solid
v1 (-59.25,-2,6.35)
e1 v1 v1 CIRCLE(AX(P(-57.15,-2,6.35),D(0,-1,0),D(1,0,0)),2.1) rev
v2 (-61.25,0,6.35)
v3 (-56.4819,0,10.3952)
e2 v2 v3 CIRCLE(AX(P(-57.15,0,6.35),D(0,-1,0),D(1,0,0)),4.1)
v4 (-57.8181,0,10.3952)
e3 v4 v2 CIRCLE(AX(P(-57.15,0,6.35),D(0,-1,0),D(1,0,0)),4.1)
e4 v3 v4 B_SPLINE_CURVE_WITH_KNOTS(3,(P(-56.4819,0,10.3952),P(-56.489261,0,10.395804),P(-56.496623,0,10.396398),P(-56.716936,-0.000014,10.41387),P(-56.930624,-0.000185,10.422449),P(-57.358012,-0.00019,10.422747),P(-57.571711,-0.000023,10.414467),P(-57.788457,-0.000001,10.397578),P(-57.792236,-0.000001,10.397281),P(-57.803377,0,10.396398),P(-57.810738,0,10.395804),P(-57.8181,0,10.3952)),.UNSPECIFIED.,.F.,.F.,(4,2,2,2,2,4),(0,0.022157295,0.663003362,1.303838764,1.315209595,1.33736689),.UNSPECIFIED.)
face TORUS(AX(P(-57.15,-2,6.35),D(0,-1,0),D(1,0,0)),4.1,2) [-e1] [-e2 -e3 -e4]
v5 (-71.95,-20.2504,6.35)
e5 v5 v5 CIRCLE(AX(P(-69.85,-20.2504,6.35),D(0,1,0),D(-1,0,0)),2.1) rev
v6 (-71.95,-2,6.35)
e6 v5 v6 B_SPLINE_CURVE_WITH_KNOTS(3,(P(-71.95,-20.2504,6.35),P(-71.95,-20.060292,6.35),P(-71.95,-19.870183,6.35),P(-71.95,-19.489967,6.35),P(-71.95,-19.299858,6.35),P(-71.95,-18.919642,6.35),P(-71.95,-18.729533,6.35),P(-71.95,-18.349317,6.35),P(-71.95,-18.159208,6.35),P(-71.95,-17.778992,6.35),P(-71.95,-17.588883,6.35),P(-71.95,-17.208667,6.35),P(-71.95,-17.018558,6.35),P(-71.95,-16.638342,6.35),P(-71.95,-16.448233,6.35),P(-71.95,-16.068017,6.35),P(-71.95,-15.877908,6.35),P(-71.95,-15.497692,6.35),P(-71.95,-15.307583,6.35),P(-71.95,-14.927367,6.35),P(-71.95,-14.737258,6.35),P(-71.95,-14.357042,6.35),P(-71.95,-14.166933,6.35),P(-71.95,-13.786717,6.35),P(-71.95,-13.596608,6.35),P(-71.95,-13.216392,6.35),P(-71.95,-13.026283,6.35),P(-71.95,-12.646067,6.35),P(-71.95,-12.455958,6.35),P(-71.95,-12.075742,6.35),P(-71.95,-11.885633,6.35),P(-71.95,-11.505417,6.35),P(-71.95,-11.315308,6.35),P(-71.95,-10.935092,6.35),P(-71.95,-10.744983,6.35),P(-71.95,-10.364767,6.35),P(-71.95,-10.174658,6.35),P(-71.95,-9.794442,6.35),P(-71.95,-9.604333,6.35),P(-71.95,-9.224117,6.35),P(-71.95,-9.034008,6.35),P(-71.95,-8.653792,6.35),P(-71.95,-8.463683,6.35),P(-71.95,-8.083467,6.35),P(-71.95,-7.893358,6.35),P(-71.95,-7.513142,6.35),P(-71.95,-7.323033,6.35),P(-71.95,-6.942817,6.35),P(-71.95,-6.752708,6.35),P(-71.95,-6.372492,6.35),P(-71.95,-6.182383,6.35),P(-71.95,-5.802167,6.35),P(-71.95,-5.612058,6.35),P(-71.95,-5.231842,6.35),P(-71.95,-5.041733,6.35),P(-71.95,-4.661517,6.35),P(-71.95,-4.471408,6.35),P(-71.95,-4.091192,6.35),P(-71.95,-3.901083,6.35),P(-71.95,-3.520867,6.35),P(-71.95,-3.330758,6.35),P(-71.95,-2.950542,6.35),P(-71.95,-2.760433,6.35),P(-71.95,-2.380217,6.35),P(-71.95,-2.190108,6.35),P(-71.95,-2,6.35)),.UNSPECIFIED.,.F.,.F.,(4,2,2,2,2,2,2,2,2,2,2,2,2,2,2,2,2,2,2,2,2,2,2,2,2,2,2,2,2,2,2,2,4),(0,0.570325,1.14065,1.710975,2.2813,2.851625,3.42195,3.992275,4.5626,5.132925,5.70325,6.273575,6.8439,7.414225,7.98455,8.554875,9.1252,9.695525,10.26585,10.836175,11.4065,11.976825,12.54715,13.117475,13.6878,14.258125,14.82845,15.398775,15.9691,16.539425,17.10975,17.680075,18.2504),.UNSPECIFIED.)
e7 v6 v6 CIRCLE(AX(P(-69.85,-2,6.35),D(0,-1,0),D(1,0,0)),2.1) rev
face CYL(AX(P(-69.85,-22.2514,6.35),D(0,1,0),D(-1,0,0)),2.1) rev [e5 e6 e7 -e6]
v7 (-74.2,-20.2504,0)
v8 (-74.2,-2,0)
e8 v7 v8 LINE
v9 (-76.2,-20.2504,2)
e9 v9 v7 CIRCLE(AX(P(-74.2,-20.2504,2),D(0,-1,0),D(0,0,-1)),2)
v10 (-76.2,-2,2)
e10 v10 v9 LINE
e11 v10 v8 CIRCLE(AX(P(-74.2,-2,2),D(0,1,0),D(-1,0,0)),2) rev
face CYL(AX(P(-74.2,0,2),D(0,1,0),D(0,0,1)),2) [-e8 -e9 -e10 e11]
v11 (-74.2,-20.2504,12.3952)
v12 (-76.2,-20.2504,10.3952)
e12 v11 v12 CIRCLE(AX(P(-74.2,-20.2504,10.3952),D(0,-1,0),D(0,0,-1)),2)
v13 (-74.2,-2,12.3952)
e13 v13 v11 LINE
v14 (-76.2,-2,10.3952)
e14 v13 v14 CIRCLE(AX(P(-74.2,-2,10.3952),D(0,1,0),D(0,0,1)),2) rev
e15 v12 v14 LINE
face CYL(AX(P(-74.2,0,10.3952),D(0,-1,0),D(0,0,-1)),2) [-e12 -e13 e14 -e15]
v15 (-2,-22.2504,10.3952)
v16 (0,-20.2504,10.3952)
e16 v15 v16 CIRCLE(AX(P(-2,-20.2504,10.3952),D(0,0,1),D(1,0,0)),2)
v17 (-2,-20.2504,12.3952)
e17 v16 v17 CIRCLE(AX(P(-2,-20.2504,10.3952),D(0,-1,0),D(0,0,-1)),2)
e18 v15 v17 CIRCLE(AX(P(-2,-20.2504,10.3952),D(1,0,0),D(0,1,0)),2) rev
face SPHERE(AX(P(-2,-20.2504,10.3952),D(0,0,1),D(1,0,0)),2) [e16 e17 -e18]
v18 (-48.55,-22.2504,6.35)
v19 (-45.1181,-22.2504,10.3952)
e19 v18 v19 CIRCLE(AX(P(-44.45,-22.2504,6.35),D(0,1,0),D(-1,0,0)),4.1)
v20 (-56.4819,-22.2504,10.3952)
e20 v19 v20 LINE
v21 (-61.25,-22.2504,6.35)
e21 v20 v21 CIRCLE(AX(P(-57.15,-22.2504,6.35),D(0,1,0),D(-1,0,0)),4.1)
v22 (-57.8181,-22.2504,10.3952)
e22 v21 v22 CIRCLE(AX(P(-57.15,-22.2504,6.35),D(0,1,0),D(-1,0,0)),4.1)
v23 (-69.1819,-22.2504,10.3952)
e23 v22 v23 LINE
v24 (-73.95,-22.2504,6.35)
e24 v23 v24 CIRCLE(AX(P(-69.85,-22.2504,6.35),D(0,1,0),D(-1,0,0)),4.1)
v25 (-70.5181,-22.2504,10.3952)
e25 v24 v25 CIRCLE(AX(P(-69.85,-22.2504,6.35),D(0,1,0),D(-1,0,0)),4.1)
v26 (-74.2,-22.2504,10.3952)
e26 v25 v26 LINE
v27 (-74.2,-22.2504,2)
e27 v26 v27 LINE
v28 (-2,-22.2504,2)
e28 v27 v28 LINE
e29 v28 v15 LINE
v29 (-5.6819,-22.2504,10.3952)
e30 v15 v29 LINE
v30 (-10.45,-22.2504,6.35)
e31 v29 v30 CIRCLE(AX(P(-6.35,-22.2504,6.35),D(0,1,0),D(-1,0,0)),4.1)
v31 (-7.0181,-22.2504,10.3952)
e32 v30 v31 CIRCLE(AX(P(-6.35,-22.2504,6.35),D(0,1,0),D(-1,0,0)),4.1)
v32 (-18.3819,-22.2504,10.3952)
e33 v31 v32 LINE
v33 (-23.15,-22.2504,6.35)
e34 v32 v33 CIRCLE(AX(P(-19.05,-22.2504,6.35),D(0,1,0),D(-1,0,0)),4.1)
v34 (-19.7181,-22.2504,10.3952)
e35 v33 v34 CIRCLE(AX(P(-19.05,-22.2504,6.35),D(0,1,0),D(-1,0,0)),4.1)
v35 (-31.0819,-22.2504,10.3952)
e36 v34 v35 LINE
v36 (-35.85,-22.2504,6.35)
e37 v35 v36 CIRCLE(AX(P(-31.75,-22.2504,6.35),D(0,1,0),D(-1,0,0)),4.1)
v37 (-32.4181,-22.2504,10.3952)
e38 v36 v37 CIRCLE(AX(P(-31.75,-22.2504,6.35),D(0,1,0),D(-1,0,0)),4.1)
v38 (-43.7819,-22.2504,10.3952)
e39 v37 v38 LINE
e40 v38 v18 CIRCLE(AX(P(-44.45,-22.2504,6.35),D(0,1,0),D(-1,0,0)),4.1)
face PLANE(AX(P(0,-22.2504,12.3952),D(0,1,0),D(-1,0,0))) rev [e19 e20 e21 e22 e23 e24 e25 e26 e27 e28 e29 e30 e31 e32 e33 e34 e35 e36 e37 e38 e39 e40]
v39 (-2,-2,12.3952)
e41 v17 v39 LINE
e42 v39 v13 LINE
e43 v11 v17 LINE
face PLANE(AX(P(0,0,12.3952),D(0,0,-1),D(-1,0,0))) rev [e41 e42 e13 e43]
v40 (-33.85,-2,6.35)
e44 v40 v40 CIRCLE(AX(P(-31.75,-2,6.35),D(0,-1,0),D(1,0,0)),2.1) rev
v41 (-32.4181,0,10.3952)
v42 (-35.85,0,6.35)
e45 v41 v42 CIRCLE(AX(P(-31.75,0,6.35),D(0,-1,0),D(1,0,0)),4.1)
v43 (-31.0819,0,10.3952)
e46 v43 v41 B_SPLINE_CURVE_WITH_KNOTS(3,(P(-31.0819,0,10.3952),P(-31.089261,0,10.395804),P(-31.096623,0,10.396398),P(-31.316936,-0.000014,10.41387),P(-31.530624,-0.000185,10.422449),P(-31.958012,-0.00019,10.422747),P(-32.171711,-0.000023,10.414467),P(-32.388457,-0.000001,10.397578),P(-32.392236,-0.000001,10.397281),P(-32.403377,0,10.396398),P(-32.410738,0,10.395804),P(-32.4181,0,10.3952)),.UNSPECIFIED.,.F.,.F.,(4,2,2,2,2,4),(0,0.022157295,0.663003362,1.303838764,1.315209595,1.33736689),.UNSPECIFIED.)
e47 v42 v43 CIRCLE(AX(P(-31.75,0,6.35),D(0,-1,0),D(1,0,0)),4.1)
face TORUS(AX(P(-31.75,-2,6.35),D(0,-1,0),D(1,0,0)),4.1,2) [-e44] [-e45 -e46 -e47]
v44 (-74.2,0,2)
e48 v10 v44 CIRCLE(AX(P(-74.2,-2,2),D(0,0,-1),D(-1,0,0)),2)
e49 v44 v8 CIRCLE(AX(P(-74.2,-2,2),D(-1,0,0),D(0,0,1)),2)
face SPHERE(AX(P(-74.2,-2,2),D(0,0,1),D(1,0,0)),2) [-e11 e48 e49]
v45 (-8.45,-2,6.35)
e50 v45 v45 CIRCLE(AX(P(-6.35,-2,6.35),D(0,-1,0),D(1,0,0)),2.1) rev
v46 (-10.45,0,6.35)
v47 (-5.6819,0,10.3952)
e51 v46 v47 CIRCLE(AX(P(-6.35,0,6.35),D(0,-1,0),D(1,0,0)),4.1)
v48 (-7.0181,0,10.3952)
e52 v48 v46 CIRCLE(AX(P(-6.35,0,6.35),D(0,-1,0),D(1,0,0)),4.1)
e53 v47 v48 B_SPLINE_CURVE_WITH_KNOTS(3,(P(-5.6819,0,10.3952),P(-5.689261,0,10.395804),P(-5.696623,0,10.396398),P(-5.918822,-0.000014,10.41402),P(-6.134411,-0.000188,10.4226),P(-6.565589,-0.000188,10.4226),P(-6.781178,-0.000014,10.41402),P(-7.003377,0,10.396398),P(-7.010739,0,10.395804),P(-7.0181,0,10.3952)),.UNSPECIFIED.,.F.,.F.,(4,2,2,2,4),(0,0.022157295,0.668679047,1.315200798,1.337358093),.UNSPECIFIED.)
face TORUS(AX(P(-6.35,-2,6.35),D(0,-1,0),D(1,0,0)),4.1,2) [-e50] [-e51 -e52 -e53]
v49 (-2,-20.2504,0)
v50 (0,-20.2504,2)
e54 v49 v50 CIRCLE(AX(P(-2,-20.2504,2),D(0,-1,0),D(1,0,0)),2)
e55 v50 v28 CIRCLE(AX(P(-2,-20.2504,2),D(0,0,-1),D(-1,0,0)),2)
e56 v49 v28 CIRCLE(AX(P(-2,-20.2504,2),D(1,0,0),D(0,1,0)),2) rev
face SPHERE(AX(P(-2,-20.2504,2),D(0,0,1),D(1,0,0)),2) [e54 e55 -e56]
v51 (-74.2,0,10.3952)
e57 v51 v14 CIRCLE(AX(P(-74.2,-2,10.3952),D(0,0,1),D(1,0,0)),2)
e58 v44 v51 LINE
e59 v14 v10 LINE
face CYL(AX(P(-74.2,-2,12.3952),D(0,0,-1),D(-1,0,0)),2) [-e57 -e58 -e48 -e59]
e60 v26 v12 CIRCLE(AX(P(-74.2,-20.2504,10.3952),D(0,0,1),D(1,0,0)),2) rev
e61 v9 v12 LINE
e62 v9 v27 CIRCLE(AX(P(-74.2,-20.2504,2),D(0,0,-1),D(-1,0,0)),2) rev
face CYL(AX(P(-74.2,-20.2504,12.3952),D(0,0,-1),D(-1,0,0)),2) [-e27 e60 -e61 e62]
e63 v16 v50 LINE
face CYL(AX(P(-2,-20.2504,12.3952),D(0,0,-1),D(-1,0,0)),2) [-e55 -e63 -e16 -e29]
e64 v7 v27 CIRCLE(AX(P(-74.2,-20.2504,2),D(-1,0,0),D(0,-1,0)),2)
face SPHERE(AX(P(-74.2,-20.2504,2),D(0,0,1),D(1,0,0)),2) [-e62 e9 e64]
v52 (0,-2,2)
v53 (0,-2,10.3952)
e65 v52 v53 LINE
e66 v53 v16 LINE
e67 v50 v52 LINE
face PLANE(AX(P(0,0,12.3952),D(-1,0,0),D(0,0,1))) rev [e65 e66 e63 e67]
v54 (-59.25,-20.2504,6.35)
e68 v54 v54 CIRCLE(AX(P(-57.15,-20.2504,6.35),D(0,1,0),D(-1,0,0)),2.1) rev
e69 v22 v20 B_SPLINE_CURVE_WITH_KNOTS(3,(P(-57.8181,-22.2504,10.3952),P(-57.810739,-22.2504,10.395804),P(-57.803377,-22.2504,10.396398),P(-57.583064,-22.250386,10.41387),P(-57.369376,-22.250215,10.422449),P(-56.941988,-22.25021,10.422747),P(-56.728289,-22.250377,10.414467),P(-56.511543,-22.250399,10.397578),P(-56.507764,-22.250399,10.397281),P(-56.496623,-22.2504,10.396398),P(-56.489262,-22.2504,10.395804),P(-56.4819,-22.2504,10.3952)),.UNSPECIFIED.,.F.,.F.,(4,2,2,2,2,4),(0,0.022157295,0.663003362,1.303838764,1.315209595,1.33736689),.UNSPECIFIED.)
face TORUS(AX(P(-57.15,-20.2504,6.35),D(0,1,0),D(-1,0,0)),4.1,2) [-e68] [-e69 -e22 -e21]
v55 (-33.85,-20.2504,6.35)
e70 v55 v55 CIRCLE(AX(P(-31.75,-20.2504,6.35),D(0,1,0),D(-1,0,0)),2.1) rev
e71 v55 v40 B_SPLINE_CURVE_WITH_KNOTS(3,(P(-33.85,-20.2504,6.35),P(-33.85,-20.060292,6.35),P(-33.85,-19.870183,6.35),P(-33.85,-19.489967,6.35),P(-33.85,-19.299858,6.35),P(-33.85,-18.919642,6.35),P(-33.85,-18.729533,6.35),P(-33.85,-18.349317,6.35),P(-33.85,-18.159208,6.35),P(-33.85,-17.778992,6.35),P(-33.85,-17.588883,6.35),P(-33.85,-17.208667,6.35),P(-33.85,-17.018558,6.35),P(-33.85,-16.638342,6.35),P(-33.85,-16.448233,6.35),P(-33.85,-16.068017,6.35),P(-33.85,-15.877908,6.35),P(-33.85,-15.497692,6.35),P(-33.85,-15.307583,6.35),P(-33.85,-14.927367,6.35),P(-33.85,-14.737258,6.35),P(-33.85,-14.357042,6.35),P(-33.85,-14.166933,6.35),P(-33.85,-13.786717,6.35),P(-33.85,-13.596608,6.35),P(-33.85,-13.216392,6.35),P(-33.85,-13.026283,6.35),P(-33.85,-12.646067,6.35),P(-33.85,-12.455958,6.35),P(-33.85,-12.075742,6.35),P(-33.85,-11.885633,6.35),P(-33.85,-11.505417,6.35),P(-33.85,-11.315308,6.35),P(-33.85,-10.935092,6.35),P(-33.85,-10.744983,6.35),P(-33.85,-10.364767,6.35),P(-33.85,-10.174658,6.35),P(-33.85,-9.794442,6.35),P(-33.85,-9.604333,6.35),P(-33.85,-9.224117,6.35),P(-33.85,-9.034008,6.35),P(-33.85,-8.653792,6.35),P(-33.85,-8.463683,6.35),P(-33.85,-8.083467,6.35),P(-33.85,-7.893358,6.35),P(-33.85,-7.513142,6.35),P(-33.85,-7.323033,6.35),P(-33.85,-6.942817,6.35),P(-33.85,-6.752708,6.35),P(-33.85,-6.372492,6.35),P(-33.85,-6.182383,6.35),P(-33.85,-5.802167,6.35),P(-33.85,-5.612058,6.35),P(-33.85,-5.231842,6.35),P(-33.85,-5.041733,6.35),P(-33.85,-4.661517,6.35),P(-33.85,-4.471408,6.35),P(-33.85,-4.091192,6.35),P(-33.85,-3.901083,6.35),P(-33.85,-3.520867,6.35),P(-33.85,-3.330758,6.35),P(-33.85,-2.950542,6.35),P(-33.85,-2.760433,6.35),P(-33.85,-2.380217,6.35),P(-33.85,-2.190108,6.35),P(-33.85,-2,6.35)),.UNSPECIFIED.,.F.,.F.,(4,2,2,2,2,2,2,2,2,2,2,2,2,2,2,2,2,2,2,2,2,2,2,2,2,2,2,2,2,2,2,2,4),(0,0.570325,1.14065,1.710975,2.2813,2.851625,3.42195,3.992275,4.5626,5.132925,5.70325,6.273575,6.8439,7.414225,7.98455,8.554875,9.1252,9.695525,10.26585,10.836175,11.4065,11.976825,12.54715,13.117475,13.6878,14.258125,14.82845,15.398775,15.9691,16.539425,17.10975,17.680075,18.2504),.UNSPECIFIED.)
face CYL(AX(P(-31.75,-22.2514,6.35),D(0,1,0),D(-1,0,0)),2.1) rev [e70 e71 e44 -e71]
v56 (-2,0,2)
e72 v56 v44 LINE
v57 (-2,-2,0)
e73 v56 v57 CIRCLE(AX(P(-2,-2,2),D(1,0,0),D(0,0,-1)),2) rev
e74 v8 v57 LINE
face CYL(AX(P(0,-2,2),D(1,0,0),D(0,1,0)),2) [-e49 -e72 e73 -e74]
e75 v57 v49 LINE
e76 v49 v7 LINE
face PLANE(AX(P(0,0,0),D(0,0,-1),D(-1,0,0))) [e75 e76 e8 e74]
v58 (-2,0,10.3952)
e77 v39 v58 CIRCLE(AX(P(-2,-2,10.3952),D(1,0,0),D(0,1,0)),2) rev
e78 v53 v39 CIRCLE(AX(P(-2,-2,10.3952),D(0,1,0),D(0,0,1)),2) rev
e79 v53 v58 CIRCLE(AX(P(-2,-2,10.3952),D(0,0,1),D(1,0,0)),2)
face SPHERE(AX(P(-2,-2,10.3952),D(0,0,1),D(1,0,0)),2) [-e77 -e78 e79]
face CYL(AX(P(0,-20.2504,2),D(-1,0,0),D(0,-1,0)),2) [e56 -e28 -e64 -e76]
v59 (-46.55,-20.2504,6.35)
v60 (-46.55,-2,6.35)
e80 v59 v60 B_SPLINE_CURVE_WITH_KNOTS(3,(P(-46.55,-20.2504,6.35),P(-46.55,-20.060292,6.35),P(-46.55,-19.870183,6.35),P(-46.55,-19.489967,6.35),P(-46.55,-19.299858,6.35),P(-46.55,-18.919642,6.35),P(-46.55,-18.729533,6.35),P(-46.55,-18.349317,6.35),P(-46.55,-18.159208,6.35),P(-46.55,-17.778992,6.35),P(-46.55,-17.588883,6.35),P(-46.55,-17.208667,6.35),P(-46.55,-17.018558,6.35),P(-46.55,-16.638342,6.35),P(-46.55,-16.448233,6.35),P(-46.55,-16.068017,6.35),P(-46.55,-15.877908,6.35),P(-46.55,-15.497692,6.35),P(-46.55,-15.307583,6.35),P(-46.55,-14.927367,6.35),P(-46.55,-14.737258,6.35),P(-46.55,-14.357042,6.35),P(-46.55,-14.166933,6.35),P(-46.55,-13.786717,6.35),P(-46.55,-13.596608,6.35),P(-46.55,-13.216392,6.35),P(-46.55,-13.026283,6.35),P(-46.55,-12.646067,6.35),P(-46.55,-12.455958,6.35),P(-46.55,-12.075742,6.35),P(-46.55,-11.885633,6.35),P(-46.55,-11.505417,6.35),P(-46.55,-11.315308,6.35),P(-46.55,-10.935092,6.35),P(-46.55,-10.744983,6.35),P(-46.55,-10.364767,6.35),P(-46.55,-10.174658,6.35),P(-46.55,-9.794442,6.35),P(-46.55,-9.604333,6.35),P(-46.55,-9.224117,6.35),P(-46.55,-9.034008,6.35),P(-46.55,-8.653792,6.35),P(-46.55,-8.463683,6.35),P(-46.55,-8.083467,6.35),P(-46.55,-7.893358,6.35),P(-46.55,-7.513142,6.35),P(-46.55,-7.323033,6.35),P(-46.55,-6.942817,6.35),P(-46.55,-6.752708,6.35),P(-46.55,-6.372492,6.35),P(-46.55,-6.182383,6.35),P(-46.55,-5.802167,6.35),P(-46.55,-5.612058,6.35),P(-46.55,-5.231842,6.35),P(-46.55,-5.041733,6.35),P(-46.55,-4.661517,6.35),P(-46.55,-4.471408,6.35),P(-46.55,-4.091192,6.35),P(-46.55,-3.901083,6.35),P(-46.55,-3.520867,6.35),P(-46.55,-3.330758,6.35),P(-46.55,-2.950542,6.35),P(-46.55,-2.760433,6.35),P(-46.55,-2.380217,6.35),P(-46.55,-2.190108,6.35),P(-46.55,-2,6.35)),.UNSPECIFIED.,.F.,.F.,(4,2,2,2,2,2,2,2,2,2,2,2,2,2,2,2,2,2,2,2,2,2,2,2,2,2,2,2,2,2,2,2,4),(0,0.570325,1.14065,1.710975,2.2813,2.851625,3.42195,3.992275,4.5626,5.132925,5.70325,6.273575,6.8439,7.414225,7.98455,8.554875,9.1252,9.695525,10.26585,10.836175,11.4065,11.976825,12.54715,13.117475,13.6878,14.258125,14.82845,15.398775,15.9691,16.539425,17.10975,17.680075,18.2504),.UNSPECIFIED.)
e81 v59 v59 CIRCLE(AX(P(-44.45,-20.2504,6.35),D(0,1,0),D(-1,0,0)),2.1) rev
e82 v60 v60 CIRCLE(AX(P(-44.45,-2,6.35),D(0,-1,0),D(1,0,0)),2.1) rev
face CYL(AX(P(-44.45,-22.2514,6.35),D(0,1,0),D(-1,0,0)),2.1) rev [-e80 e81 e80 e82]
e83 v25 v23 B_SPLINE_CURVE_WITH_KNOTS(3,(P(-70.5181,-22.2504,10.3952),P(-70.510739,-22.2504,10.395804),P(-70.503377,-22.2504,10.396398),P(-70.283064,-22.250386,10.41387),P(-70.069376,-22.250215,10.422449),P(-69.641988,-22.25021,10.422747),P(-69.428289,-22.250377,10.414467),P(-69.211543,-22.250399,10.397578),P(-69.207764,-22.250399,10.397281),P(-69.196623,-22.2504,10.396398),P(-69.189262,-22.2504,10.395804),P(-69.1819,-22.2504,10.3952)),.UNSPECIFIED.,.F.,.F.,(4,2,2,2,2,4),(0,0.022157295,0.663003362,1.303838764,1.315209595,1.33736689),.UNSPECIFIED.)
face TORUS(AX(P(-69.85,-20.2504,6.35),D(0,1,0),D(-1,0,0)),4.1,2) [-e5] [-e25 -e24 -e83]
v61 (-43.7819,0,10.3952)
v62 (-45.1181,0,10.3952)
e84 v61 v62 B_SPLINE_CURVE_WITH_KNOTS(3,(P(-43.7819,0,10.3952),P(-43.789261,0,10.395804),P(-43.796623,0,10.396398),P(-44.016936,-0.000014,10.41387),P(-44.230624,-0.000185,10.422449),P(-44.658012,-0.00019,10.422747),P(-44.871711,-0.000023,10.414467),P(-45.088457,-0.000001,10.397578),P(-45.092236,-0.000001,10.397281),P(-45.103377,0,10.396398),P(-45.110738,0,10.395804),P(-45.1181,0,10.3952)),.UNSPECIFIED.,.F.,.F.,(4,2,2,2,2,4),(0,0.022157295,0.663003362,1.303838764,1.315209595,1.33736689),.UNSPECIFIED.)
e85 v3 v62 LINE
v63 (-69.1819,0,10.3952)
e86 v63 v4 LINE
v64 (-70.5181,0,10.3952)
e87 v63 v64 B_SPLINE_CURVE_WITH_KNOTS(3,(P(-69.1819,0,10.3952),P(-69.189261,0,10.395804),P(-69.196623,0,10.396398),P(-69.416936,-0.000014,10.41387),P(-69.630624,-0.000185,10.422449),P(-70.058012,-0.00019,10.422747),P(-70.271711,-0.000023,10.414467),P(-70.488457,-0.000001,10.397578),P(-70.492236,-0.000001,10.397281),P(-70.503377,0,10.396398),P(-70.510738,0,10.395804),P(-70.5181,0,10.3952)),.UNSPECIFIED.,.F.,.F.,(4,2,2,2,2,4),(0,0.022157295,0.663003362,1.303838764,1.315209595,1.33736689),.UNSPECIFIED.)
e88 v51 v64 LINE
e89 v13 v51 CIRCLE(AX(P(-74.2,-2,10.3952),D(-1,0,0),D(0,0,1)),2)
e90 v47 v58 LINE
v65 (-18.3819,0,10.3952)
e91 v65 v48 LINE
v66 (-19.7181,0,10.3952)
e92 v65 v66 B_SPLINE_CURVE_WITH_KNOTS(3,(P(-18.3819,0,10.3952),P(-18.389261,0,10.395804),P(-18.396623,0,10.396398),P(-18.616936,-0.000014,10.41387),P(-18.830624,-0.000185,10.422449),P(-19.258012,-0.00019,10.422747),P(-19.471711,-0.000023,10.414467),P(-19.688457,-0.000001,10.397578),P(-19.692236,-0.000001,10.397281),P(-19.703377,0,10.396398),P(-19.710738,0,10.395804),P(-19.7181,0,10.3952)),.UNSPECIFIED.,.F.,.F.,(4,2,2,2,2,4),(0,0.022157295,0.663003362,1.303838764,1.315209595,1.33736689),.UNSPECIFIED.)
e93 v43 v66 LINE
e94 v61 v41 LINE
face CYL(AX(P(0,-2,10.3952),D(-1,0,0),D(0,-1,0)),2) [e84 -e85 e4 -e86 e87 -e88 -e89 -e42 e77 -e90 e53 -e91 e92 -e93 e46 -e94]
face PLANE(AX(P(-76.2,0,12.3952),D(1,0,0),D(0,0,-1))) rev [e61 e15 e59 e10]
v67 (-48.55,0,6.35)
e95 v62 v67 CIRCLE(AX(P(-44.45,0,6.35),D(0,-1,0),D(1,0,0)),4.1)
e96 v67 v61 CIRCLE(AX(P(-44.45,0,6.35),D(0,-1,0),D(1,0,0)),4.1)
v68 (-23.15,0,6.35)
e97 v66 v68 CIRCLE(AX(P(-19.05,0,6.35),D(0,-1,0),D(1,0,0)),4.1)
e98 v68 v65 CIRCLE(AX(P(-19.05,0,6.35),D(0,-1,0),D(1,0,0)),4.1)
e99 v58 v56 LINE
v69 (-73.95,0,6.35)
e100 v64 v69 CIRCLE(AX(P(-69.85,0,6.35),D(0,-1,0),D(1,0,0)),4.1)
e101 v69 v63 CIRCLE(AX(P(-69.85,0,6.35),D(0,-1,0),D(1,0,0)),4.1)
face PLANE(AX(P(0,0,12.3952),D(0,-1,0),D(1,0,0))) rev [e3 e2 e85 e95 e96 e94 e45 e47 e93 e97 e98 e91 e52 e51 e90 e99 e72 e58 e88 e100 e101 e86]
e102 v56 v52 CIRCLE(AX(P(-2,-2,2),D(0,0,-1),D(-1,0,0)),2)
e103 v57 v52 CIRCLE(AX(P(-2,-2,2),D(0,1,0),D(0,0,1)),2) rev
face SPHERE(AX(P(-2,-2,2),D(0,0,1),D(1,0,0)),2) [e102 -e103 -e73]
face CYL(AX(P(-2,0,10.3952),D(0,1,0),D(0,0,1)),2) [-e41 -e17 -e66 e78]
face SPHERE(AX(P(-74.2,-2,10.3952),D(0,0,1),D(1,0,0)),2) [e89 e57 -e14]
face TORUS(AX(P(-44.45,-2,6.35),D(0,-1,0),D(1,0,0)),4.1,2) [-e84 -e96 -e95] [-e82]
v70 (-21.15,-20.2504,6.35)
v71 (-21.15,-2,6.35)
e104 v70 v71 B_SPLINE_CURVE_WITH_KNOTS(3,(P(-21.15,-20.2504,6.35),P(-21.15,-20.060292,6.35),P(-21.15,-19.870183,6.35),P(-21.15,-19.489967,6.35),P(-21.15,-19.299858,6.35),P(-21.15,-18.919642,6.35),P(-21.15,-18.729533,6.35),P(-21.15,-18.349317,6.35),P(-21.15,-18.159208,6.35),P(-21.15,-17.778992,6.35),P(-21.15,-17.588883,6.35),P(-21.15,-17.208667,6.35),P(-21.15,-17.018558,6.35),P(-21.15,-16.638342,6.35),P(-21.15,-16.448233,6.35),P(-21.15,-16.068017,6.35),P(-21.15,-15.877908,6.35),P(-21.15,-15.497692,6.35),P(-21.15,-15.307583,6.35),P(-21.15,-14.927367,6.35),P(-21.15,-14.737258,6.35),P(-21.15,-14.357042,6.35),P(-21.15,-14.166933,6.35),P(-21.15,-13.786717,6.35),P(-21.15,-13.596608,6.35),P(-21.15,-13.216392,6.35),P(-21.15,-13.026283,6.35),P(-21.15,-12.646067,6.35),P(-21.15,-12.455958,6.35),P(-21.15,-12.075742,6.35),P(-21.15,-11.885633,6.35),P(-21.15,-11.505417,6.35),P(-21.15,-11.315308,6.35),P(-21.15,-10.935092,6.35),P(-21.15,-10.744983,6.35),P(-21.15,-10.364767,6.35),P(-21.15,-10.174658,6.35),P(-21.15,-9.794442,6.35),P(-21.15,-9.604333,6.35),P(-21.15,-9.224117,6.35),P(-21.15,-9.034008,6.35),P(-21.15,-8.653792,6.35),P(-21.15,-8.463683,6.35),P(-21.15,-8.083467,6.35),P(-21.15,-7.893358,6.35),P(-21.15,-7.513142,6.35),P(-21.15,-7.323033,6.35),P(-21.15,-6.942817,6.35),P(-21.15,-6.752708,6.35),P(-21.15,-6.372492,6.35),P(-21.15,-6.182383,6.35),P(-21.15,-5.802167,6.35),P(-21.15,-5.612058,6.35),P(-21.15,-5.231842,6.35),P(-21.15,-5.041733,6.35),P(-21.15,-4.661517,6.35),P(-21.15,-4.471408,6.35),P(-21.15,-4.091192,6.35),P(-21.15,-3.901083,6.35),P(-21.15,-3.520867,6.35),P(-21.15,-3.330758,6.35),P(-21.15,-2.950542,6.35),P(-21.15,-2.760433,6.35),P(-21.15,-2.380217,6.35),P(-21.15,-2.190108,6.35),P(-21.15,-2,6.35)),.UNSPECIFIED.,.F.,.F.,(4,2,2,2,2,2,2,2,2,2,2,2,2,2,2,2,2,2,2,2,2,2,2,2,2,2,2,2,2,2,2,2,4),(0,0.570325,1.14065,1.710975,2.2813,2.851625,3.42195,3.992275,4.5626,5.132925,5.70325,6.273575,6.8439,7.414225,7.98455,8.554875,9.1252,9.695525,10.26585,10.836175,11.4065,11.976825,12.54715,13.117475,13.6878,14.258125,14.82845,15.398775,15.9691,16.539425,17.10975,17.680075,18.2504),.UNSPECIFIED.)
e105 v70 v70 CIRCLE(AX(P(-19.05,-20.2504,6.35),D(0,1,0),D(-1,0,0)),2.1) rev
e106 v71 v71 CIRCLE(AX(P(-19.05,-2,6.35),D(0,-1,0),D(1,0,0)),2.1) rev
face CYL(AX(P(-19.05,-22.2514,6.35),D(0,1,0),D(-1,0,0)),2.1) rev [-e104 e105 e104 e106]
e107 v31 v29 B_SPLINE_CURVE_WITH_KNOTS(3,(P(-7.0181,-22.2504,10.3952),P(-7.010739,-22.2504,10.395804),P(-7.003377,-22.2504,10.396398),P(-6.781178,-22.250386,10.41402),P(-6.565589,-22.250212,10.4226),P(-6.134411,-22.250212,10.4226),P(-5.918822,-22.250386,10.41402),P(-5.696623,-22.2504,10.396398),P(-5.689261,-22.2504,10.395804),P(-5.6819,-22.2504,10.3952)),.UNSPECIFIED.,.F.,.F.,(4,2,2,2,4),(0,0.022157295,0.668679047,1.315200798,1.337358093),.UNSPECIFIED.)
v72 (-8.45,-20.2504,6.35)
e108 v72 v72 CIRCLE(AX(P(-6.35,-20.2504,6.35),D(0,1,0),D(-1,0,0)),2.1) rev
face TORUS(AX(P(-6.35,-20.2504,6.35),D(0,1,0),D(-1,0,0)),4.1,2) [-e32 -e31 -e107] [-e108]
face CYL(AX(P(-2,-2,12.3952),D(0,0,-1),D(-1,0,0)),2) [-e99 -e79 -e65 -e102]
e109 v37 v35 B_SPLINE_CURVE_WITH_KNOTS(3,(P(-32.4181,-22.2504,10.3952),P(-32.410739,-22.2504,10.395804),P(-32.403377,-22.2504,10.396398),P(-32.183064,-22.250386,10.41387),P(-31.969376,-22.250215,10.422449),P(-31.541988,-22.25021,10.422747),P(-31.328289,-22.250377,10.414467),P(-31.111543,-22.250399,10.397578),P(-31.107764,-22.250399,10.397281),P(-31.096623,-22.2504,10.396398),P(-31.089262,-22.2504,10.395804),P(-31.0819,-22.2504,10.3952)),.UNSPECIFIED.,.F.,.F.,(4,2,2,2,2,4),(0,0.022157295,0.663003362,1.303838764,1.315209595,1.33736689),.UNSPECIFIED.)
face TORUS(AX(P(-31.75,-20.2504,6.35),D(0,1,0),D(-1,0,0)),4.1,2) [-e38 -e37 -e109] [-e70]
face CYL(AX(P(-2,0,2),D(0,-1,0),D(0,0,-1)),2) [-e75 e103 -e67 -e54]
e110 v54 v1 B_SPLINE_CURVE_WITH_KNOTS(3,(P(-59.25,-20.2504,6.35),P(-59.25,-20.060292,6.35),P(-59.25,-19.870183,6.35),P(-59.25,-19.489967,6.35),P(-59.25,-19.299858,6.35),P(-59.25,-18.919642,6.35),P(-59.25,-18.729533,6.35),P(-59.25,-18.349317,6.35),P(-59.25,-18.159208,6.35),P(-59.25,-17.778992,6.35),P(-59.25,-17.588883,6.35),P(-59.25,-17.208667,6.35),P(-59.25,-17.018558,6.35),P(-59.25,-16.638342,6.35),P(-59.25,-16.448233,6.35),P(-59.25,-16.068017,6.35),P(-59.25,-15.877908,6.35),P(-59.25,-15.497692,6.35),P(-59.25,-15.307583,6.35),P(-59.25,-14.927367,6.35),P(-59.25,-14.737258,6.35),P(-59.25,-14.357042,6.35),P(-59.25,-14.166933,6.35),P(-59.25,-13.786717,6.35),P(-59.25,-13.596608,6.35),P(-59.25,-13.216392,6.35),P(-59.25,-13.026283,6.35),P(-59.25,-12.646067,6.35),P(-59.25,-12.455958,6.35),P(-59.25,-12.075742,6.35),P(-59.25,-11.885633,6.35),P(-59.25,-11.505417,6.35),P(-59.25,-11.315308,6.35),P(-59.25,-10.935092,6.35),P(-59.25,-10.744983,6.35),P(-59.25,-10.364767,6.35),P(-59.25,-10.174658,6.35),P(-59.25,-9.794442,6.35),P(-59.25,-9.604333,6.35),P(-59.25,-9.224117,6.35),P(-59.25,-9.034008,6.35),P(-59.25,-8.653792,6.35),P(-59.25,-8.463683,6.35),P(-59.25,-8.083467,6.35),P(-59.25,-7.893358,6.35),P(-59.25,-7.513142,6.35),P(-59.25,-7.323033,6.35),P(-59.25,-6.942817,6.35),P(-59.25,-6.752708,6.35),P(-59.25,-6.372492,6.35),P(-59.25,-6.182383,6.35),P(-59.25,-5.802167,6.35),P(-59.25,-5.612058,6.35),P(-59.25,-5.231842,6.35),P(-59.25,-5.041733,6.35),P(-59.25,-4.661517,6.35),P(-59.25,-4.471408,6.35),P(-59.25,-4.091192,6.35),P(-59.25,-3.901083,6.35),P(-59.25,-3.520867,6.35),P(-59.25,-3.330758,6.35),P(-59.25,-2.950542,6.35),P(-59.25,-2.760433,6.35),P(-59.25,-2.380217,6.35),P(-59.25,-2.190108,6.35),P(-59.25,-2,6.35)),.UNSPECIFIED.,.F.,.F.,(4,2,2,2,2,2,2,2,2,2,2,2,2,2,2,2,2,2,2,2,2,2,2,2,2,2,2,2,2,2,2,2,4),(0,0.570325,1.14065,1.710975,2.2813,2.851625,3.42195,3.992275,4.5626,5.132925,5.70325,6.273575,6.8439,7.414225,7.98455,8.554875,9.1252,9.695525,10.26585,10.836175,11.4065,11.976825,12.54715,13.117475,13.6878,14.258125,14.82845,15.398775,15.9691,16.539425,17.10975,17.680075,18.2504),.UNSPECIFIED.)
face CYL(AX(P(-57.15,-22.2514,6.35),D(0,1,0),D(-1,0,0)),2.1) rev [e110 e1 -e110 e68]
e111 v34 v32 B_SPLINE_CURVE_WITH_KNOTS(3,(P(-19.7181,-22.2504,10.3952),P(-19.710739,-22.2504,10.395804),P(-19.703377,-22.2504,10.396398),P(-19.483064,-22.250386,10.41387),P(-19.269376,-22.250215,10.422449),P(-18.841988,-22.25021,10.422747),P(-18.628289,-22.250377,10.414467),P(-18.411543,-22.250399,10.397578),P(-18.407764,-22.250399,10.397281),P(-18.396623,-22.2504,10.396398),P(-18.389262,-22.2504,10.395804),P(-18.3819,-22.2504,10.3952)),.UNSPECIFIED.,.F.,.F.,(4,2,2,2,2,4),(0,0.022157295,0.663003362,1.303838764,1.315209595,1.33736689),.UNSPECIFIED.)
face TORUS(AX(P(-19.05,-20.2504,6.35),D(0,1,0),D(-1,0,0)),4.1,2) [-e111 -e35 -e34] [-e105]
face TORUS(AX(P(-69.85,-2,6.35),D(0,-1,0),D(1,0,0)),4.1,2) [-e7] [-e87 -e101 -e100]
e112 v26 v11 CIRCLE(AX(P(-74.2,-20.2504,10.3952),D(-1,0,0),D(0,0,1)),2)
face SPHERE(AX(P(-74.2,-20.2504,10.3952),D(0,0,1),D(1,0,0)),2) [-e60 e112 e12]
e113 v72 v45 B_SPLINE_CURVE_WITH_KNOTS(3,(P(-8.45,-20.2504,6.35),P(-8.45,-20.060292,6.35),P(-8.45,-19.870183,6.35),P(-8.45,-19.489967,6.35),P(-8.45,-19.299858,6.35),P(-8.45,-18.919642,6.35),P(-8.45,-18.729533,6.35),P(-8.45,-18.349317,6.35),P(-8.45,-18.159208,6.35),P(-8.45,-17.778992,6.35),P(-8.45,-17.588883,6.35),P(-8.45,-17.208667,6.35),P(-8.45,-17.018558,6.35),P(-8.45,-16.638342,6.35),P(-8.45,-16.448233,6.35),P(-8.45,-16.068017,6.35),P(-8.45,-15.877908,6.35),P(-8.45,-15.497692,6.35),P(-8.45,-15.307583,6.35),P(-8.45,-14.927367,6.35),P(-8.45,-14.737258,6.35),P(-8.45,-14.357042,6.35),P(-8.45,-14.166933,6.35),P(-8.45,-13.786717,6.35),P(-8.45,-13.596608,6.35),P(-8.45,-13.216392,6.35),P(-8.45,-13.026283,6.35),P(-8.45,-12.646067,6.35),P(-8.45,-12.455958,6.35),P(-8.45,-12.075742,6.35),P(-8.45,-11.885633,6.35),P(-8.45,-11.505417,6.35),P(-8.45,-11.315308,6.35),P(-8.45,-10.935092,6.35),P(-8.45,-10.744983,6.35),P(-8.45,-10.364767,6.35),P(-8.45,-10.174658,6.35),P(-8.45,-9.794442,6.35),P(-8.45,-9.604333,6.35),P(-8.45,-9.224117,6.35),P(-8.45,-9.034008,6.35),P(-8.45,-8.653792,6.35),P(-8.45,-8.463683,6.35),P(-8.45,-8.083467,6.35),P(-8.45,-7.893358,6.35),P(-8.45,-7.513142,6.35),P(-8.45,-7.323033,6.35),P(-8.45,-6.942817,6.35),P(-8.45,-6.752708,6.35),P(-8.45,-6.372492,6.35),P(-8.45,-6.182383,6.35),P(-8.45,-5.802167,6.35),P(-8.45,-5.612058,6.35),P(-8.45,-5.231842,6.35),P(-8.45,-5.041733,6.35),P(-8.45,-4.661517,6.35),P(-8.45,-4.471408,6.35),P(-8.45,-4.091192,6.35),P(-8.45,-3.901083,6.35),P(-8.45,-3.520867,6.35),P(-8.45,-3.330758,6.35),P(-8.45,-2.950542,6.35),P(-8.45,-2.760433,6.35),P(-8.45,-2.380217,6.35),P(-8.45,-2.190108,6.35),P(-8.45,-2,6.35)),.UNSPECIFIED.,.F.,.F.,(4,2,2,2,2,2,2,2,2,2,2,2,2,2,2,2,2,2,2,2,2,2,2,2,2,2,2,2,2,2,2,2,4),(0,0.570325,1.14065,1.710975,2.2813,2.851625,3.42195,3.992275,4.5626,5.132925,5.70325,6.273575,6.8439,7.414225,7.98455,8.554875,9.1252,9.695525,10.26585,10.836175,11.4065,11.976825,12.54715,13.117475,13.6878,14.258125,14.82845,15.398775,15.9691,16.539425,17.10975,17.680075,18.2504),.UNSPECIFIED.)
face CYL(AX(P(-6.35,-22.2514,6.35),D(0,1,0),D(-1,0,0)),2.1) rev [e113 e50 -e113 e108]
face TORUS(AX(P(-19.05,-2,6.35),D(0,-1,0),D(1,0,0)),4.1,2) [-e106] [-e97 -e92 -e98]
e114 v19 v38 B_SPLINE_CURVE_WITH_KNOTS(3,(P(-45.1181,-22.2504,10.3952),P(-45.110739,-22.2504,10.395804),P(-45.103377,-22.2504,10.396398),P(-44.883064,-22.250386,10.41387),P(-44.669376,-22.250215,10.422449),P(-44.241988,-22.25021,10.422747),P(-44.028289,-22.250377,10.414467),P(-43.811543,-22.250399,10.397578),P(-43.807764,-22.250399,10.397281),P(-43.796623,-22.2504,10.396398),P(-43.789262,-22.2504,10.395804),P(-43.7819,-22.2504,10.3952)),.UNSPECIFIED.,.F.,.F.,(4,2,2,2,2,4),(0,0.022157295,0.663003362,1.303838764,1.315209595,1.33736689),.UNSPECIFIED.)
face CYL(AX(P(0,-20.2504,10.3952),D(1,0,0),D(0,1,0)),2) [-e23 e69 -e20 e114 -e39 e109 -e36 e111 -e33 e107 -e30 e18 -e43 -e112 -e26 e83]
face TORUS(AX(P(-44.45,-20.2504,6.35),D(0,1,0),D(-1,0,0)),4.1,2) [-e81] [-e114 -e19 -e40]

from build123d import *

# Parameters (mm, degrees)
SKETCH1_W           = 76.2
SKETCH1_H           = 22.2504
BOSS_EXTRUDE1_DEPTH = 12.3952
CUT_EXTRUDE1_REACH  = 82.344
SKETCH2_R           = 2.1
FILLET1_R           = 2


with BuildPart() as part:
    # Sketch1 → Boss-Extrude1 (new body)
    with BuildSketch(Plane.XY):
        with Locations((-38.1, -11.1252)):
            Rectangle(SKETCH1_W, SKETCH1_H)
    extrude(amount=BOSS_EXTRUDE1_DEPTH)

    # Sketch2 → Cut-Extrude1 (cut, up to next)
    with BuildSketch(Plane(origin=(0, 0, 0), x_dir=(1, 0, 0), z_dir=(0, 1, 0)), mode=Mode.PRIVATE) as cut_extrude1_sk1:
        with Locations(Location((-69.85, -6.35, 0), (0, 0, 180))):
            Circle(SKETCH2_R)
    cut_extrude1_tool1 = extrude(cut_extrude1_sk1.sketch, amount=-CUT_EXTRUDE1_REACH, mode=Mode.PRIVATE) & part.part
    # Sketch2 → Cut-Extrude1 (cut, up to next)
    with BuildSketch(Plane(origin=(0, 0, 0), x_dir=(1, 0, 0), z_dir=(0, 1, 0)), mode=Mode.PRIVATE) as cut_extrude1_sk2:
        with Locations(Location((-57.15, -6.35, 0), (0, 0, 180))):
            Circle(SKETCH2_R)
    cut_extrude1_tool2 = extrude(cut_extrude1_sk2.sketch, amount=-CUT_EXTRUDE1_REACH, mode=Mode.PRIVATE) & part.part
    # Sketch2 → Cut-Extrude1 (cut, up to next)
    with BuildSketch(Plane(origin=(0, 0, 0), x_dir=(1, 0, 0), z_dir=(0, 1, 0)), mode=Mode.PRIVATE) as cut_extrude1_sk3:
        with Locations(Location((-44.45, -6.35, 0), (0, 0, 180))):
            Circle(SKETCH2_R)
    cut_extrude1_tool3 = extrude(cut_extrude1_sk3.sketch, amount=-CUT_EXTRUDE1_REACH, mode=Mode.PRIVATE) & part.part
    # Sketch2 → Cut-Extrude1 (cut, up to next)
    with BuildSketch(Plane(origin=(0, 0, 0), x_dir=(1, 0, 0), z_dir=(0, 1, 0)), mode=Mode.PRIVATE) as cut_extrude1_sk4:
        with Locations(Location((-31.75, -6.35, 0), (0, 0, 180))):
            Circle(SKETCH2_R)
    cut_extrude1_tool4 = extrude(cut_extrude1_sk4.sketch, amount=-CUT_EXTRUDE1_REACH, mode=Mode.PRIVATE) & part.part
    # Sketch2 → Cut-Extrude1 (cut, up to next)
    with BuildSketch(Plane(origin=(0, 0, 0), x_dir=(1, 0, 0), z_dir=(0, 1, 0)), mode=Mode.PRIVATE) as cut_extrude1_sk5:
        with Locations(Location((-19.05, -6.35, 0), (0, 0, 180))):
            Circle(SKETCH2_R)
    cut_extrude1_tool5 = extrude(cut_extrude1_sk5.sketch, amount=-CUT_EXTRUDE1_REACH, mode=Mode.PRIVATE) & part.part
    # Sketch2 → Cut-Extrude1 (cut, up to next)
    with BuildSketch(Plane(origin=(0, 0, 0), x_dir=(1, 0, 0), z_dir=(0, 1, 0)), mode=Mode.PRIVATE) as cut_extrude1_sk6:
        with Locations(Location((-6.35, -6.35, 0), (0, 0, 180))):
            Circle(SKETCH2_R)
    cut_extrude1_tool6 = extrude(cut_extrude1_sk6.sketch, amount=-CUT_EXTRUDE1_REACH, mode=Mode.PRIVATE) & part.part
    add(cut_extrude1_tool1.solids().sort_by_distance((-69.85, 0, 6.35))[0], mode=Mode.SUBTRACT)
    add(cut_extrude1_tool2.solids().sort_by_distance((-57.15, 0, 6.35))[0], mode=Mode.SUBTRACT)
    add(cut_extrude1_tool3.solids().sort_by_distance((-44.45, 0, 6.35))[0], mode=Mode.SUBTRACT)
    add(cut_extrude1_tool4.solids().sort_by_distance((-31.75, 0, 6.35))[0], mode=Mode.SUBTRACT)
    add(cut_extrude1_tool5.solids().sort_by_distance((-19.05, 0, 6.35))[0], mode=Mode.SUBTRACT)
    add(cut_extrude1_tool6.solids().sort_by_distance((-6.35, 0, 6.35))[0], mode=Mode.SUBTRACT)

    # Fillet1
    # the kernel refuses this fillet: 2 mm, written as the material it takes off along each edge
    with BuildSketch(Plane(origin=(-74.2, -2, 10.3952), x_dir=(0, 0, 1), z_dir=(0, 1, 0))) as fillet1_piece_1_section:
        Polygon((0, 0), (FILLET1_R, 0), (FILLET1_R, -FILLET1_R), (0, -FILLET1_R), align=None)
    fillet1_piece_1 = extrude(amount=FILLET1_R, mode=Mode.PRIVATE)
    fillet1_piece_1 = fillet1_piece_1 - Plane(origin=(-74.2, -2, 10.3952), x_dir=(0.7071067811865475, 0, -0.7071067811865475), z_dir=(0, 1, 0)) * Sphere(FILLET1_R, mode=Mode.PRIVATE)
    add(fillet1_piece_1, mode=Mode.SUBTRACT)
    with BuildSketch(Plane(origin=(-74.2, -20.2504, 10.3952), x_dir=(0, 0, 1), z_dir=(0, -1, 0))) as fillet1_piece_2_section:
        Polygon((0, 0), (FILLET1_R, 0), (FILLET1_R, FILLET1_R), (0, FILLET1_R), align=None)
    fillet1_piece_2 = extrude(amount=FILLET1_R, mode=Mode.PRIVATE)
    fillet1_piece_2 = fillet1_piece_2 - Plane(origin=(-74.2, -20.2504, 10.3952), x_dir=(0.7071067811865475, 0, -0.7071067811865475), z_dir=(0, -1, 0)) * Sphere(FILLET1_R, mode=Mode.PRIVATE)
    add(fillet1_piece_2, mode=Mode.SUBTRACT)
    with BuildSketch(Plane(origin=(-2, -20.2504, 10.3952), x_dir=(1, 0, 0), z_dir=(0, -1, 0))) as fillet1_piece_3_section:
        Polygon((0, 0), (FILLET1_R, 0), (FILLET1_R, FILLET1_R), (0, FILLET1_R), align=None)
    fillet1_piece_3 = extrude(amount=FILLET1_R, mode=Mode.PRIVATE)
    fillet1_piece_3 = fillet1_piece_3 - Plane(origin=(-2, -20.2504, 10.3952), x_dir=(-0.7071067811865475, 0, -0.7071067811865475), z_dir=(0, -1, 0)) * Sphere(FILLET1_R, mode=Mode.PRIVATE)
    add(fillet1_piece_3, mode=Mode.SUBTRACT)
    with BuildSketch(Plane(origin=(-2, -2, 10.3952), x_dir=(1, 0, 0), z_dir=(0, 1, 0))) as fillet1_piece_4_section:
        Polygon((0, 0), (FILLET1_R, 0), (FILLET1_R, -FILLET1_R), (0, -FILLET1_R), align=None)
    fillet1_piece_4 = extrude(amount=FILLET1_R, mode=Mode.PRIVATE)
    fillet1_piece_4 = fillet1_piece_4 - Plane(origin=(-2, -2, 10.3952), x_dir=(-0.7071067811865475, 0, -0.7071067811865475), z_dir=(0, 1, 0)) * Sphere(FILLET1_R, mode=Mode.PRIVATE)
    add(fillet1_piece_4, mode=Mode.SUBTRACT)
    with BuildSketch(Plane(origin=(-74.2, -20.2504, 2), x_dir=(0, -1, 0), z_dir=(0, 0, -1))) as fillet1_piece_5_section:
        Polygon((0, 0), (FILLET1_R, 0), (FILLET1_R, FILLET1_R), (0, FILLET1_R), align=None)
    fillet1_piece_5 = extrude(amount=FILLET1_R, mode=Mode.PRIVATE)
    fillet1_piece_5 = fillet1_piece_5 - Plane(origin=(-74.2, -20.2504, 2), x_dir=(0.7071067811865475, 0.7071067811865476, 0), z_dir=(0, 0, -1)) * Sphere(FILLET1_R, mode=Mode.PRIVATE)
    add(fillet1_piece_5, mode=Mode.SUBTRACT)
    with BuildSketch(Plane(origin=(-2, -20.2504, 2), x_dir=(0, 0, -1), z_dir=(1, 0, 0))) as fillet1_piece_6_section:
        Polygon((0, 0), (FILLET1_R, 0), (FILLET1_R, -FILLET1_R), (0, -FILLET1_R), align=None)
    fillet1_piece_6 = extrude(amount=FILLET1_R, mode=Mode.PRIVATE)
    fillet1_piece_6 = fillet1_piece_6 - Plane(origin=(-2, -20.2504, 2), x_dir=(0, 0.7071067811865475, 0.7071067811865475), z_dir=(1, 0, 0)) * Sphere(FILLET1_R, mode=Mode.PRIVATE)
    add(fillet1_piece_6, mode=Mode.SUBTRACT)
    with BuildSketch(Plane(origin=(-74.2, -2, 2), x_dir=(0, 0, -1), z_dir=(0, 1, 0))) as fillet1_piece_7_section:
        Polygon((0, 0), (FILLET1_R, 0), (FILLET1_R, FILLET1_R), (0, FILLET1_R), align=None)
    fillet1_piece_7 = extrude(amount=FILLET1_R, mode=Mode.PRIVATE)
    fillet1_piece_7 = fillet1_piece_7 - Plane(origin=(-74.2, -2, 2), x_dir=(0.7071067811865475, 0, 0.7071067811865475), z_dir=(0, 1, 0)) * Sphere(FILLET1_R, mode=Mode.PRIVATE)
    add(fillet1_piece_7, mode=Mode.SUBTRACT)
    with BuildSketch(Plane(origin=(-2, -2, 2), x_dir=(1, 0, 0), z_dir=(0, 1, 0))) as fillet1_piece_8_section:
        Polygon((0, 0), (FILLET1_R, 0), (FILLET1_R, FILLET1_R), (0, FILLET1_R), align=None)
    fillet1_piece_8 = extrude(amount=FILLET1_R, mode=Mode.PRIVATE)
    fillet1_piece_8 = fillet1_piece_8 - Plane(origin=(-2, -2, 2), x_dir=(-0.7071067811865475, 0, 0.7071067811865475), z_dir=(0, 1, 0)) * Sphere(FILLET1_R, mode=Mode.PRIVATE)
    add(fillet1_piece_8, mode=Mode.SUBTRACT)
    with BuildSketch(Plane(origin=(-76.2, -2, 12.3952), x_dir=(1, 0, 0), z_dir=(0, -1, 0)), Plane(origin=(0, -20.2504, 0), x_dir=(0, 0, 1), z_dir=(0, 1, 0))) as fillet1_piece_9:
        with BuildLine():
            CenterArc((FILLET1_R, -FILLET1_R), FILLET1_R, 90, 90)
            Line((0, -FILLET1_R), (0, 0))
            Line((0, 0), (FILLET1_R, 0))
        make_face()
    extrude(amount=18.2504, mode=Mode.SUBTRACT)
    with BuildSketch(Plane(origin=(-74.2, -22.2504, 12.3952), x_dir=(0, 1, 0), z_dir=(1, 0, 0)), Plane(origin=(-2, 0, 0), x_dir=(0, 0, 1), z_dir=(-1, 0, 0))) as fillet1_piece_10:
        with BuildLine():
            CenterArc((FILLET1_R, -FILLET1_R), FILLET1_R, 90, 90)
            Line((0, -FILLET1_R), (0, 0))
            Line((0, 0), (FILLET1_R, 0))
        make_face()
    extrude(amount=72.2, mode=Mode.SUBTRACT)
    with BuildSketch(Plane(origin=(-69.85, 0, 6.35), x_dir=(-1, 0, 0), z_dir=(0, 0, -1))) as fillet1_piece_11:
        with BuildLine():
            CenterArc((2.1 + FILLET1_R, -FILLET1_R), FILLET1_R, 90, 90)
            Line((2.1, -FILLET1_R), (2.1, 0))
            Line((2.1, 0), (2.1 + FILLET1_R, 0))
        make_face()
    revolve(axis=Axis((-69.85, 0, 6.35), (0, 1, 0)), mode=Mode.SUBTRACT)
    with BuildSketch(Plane(origin=(-69.85, -22.2504, 6.35), x_dir=(-1, 0, 0), z_dir=(0, 0, -1))) as fillet1_piece_12:
        with BuildLine():
            CenterArc((2.1 + FILLET1_R, FILLET1_R), FILLET1_R, 180, 90)
            Line((2.1 + FILLET1_R, 0), (2.1, 0))
            Line((2.1, 0), (2.1, FILLET1_R))
        make_face()
    revolve(axis=Axis((-69.85, -22.2504, 6.35), (0, 1, 0)), mode=Mode.SUBTRACT)
    with BuildSketch(Plane(origin=(-57.15, 0, 6.35), x_dir=(-1, 0, 0), z_dir=(0, 0, -1))) as fillet1_piece_13:
        with BuildLine():
            CenterArc((2.1 + FILLET1_R, -FILLET1_R), FILLET1_R, 90, 90)
            Line((2.1, -FILLET1_R), (2.1, 0))
            Line((2.1, 0), (2.1 + FILLET1_R, 0))
        make_face()
    revolve(axis=Axis((-57.15, 0, 6.35), (0, 1, 0)), mode=Mode.SUBTRACT)
    with BuildSketch(Plane(origin=(-57.15, -22.2504, 6.35), x_dir=(-1, 0, 0), z_dir=(0, 0, -1))) as fillet1_piece_14:
        with BuildLine():
            CenterArc((2.1 + FILLET1_R, FILLET1_R), FILLET1_R, 180, 90)
            Line((2.1 + FILLET1_R, 0), (2.1, 0))
            Line((2.1, 0), (2.1, FILLET1_R))
        make_face()
    revolve(axis=Axis((-57.15, -22.2504, 6.35), (0, 1, 0)), mode=Mode.SUBTRACT)
    with BuildSketch(Plane(origin=(-44.45, 0, 6.35), x_dir=(-1, 0, 0), z_dir=(0, 0, -1))) as fillet1_piece_15:
        with BuildLine():
            CenterArc((2.1 + FILLET1_R, -FILLET1_R), FILLET1_R, 90, 90)
            Line((2.1, -FILLET1_R), (2.1, 0))
            Line((2.1, 0), (2.1 + FILLET1_R, 0))
        make_face()
    revolve(axis=Axis((-44.45, 0, 6.35), (0, 1, 0)), mode=Mode.SUBTRACT)
    with BuildSketch(Plane(origin=(-44.45, -22.2504, 6.35), x_dir=(-1, 0, 0), z_dir=(0, 0, -1))) as fillet1_piece_16:
        with BuildLine():
            CenterArc((2.1 + FILLET1_R, FILLET1_R), FILLET1_R, 180, 90)
            Line((2.1 + FILLET1_R, 0), (2.1, 0))
            Line((2.1, 0), (2.1, FILLET1_R))
        make_face()
    revolve(axis=Axis((-44.45, -22.2504, 6.35), (0, 1, 0)), mode=Mode.SUBTRACT)
    with BuildSketch(Plane(origin=(-31.75, 0, 6.35), x_dir=(-1, 0, 0), z_dir=(0, 0, -1))) as fillet1_piece_17:
        with BuildLine():
            CenterArc((2.1 + FILLET1_R, -FILLET1_R), FILLET1_R, 90, 90)
            Line((2.1, -FILLET1_R), (2.1, 0))
            Line((2.1, 0), (2.1 + FILLET1_R, 0))
        make_face()
    revolve(axis=Axis((-31.75, 0, 6.35), (0, 1, 0)), mode=Mode.SUBTRACT)
    with BuildSketch(Plane(origin=(-31.75, -22.2504, 6.35), x_dir=(-1, 0, 0), z_dir=(0, 0, -1))) as fillet1_piece_18:
        with BuildLine():
            CenterArc((2.1 + FILLET1_R, FILLET1_R), FILLET1_R, 180, 90)
            Line((2.1 + FILLET1_R, 0), (2.1, 0))
            Line((2.1, 0), (2.1, FILLET1_R))
        make_face()
    revolve(axis=Axis((-31.75, -22.2504, 6.35), (0, 1, 0)), mode=Mode.SUBTRACT)
    with BuildSketch(Plane(origin=(-19.05, 0, 6.35), x_dir=(-1, 0, 0), z_dir=(0, 0, -1))) as fillet1_piece_19:
        with BuildLine():
            CenterArc((2.1 + FILLET1_R, -FILLET1_R), FILLET1_R, 90, 90)
            Line((2.1, -FILLET1_R), (2.1, 0))
            Line((2.1, 0), (2.1 + FILLET1_R, 0))
        make_face()
    revolve(axis=Axis((-19.05, 0, 6.35), (0, 1, 0)), mode=Mode.SUBTRACT)
    with BuildSketch(Plane(origin=(-19.05, -22.2504, 6.35), x_dir=(-1, 0, 0), z_dir=(0, 0, -1))) as fillet1_piece_20:
        with BuildLine():
            CenterArc((2.1 + FILLET1_R, FILLET1_R), FILLET1_R, 180, 90)
            Line((2.1 + FILLET1_R, 0), (2.1, 0))
            Line((2.1, 0), (2.1, FILLET1_R))
        make_face()
    revolve(axis=Axis((-19.05, -22.2504, 6.35), (0, 1, 0)), mode=Mode.SUBTRACT)
    with BuildSketch(Plane(origin=(-6.35, 0, 6.35), x_dir=(-1, 0, 0), z_dir=(0, 0, -1))) as fillet1_piece_21:
        with BuildLine():
            CenterArc((2.1 + FILLET1_R, -FILLET1_R), FILLET1_R, 90, 90)
            Line((2.1, -FILLET1_R), (2.1, 0))
            Line((2.1, 0), (2.1 + FILLET1_R, 0))
        make_face()
    revolve(axis=Axis((-6.35, 0, 6.35), (0, 1, 0)), mode=Mode.SUBTRACT)
    with BuildSketch(Plane(origin=(-6.35, -22.2504, 6.35), x_dir=(-1, 0, 0), z_dir=(0, 0, -1))) as fillet1_piece_22:
        with BuildLine():
            CenterArc((2.1 + FILLET1_R, FILLET1_R), FILLET1_R, 180, 90)
            Line((2.1 + FILLET1_R, 0), (2.1, 0))
            Line((2.1, 0), (2.1, FILLET1_R))
        make_face()
    revolve(axis=Axis((-6.35, -22.2504, 6.35), (0, 1, 0)), mode=Mode.SUBTRACT)
    with BuildSketch(Plane(origin=(0, -20.2504, 12.3952), x_dir=(0, 0, -1), z_dir=(0, 1, 0)), Plane(origin=(-76.2, -2, 0), x_dir=(1, 0, 0), z_dir=(0, -1, 0))) as fillet1_piece_23:
        with BuildLine():
            CenterArc((FILLET1_R, FILLET1_R), FILLET1_R, 180, 90)
            Line((0, FILLET1_R), (0, 0))
            Line((0, 0), (FILLET1_R, 0))
        make_face()
    extrude(amount=18.2504, mode=Mode.SUBTRACT)
    with BuildSketch(Plane(origin=(-74.2, -22.2504, 0), x_dir=(0, 1, 0), z_dir=(1, 0, 0)), Plane(origin=(-2, 0, 12.3952), x_dir=(0, 0, -1), z_dir=(-1, 0, 0))) as fillet1_piece_24:
        with BuildLine():
            CenterArc((FILLET1_R, FILLET1_R), FILLET1_R, 180, 90)
            Line((0, FILLET1_R), (0, 0))
            Line((0, 0), (FILLET1_R, 0))
        make_face()
    extrude(amount=72.2, mode=Mode.SUBTRACT)
    with BuildSketch(Plane(origin=(0, -22.2504, 2), x_dir=(0, 1, 0), z_dir=(0, 0, 1)), Plane(origin=(0, 0, 2), x_dir=(-1, 0, 0), z_dir=(0, 0, 1))) as fillet1_piece_25:
        with BuildLine():
            CenterArc((FILLET1_R, FILLET1_R), FILLET1_R, 180, 90)
            Line((0, FILLET1_R), (0, 0))
            Line((0, 0), (FILLET1_R, 0))
        make_face()
    extrude(amount=8.3952, mode=Mode.SUBTRACT)
    with BuildSketch(Plane(origin=(-76.2, -22.2504, 2), x_dir=(0, 1, 0), z_dir=(0, 0, 1)), Plane(origin=(-76.2, 0, 2), x_dir=(1, 0, 0), z_dir=(0, 0, 1))) as fillet1_piece_26:
        with BuildLine():
            CenterArc((FILLET1_R, -FILLET1_R), FILLET1_R, 90, 90)
            Line((0, -FILLET1_R), (0, 0))
            Line((0, 0), (FILLET1_R, 0))
        make_face()
    extrude(amount=8.3952, mode=Mode.SUBTRACT)


solid = part.part
